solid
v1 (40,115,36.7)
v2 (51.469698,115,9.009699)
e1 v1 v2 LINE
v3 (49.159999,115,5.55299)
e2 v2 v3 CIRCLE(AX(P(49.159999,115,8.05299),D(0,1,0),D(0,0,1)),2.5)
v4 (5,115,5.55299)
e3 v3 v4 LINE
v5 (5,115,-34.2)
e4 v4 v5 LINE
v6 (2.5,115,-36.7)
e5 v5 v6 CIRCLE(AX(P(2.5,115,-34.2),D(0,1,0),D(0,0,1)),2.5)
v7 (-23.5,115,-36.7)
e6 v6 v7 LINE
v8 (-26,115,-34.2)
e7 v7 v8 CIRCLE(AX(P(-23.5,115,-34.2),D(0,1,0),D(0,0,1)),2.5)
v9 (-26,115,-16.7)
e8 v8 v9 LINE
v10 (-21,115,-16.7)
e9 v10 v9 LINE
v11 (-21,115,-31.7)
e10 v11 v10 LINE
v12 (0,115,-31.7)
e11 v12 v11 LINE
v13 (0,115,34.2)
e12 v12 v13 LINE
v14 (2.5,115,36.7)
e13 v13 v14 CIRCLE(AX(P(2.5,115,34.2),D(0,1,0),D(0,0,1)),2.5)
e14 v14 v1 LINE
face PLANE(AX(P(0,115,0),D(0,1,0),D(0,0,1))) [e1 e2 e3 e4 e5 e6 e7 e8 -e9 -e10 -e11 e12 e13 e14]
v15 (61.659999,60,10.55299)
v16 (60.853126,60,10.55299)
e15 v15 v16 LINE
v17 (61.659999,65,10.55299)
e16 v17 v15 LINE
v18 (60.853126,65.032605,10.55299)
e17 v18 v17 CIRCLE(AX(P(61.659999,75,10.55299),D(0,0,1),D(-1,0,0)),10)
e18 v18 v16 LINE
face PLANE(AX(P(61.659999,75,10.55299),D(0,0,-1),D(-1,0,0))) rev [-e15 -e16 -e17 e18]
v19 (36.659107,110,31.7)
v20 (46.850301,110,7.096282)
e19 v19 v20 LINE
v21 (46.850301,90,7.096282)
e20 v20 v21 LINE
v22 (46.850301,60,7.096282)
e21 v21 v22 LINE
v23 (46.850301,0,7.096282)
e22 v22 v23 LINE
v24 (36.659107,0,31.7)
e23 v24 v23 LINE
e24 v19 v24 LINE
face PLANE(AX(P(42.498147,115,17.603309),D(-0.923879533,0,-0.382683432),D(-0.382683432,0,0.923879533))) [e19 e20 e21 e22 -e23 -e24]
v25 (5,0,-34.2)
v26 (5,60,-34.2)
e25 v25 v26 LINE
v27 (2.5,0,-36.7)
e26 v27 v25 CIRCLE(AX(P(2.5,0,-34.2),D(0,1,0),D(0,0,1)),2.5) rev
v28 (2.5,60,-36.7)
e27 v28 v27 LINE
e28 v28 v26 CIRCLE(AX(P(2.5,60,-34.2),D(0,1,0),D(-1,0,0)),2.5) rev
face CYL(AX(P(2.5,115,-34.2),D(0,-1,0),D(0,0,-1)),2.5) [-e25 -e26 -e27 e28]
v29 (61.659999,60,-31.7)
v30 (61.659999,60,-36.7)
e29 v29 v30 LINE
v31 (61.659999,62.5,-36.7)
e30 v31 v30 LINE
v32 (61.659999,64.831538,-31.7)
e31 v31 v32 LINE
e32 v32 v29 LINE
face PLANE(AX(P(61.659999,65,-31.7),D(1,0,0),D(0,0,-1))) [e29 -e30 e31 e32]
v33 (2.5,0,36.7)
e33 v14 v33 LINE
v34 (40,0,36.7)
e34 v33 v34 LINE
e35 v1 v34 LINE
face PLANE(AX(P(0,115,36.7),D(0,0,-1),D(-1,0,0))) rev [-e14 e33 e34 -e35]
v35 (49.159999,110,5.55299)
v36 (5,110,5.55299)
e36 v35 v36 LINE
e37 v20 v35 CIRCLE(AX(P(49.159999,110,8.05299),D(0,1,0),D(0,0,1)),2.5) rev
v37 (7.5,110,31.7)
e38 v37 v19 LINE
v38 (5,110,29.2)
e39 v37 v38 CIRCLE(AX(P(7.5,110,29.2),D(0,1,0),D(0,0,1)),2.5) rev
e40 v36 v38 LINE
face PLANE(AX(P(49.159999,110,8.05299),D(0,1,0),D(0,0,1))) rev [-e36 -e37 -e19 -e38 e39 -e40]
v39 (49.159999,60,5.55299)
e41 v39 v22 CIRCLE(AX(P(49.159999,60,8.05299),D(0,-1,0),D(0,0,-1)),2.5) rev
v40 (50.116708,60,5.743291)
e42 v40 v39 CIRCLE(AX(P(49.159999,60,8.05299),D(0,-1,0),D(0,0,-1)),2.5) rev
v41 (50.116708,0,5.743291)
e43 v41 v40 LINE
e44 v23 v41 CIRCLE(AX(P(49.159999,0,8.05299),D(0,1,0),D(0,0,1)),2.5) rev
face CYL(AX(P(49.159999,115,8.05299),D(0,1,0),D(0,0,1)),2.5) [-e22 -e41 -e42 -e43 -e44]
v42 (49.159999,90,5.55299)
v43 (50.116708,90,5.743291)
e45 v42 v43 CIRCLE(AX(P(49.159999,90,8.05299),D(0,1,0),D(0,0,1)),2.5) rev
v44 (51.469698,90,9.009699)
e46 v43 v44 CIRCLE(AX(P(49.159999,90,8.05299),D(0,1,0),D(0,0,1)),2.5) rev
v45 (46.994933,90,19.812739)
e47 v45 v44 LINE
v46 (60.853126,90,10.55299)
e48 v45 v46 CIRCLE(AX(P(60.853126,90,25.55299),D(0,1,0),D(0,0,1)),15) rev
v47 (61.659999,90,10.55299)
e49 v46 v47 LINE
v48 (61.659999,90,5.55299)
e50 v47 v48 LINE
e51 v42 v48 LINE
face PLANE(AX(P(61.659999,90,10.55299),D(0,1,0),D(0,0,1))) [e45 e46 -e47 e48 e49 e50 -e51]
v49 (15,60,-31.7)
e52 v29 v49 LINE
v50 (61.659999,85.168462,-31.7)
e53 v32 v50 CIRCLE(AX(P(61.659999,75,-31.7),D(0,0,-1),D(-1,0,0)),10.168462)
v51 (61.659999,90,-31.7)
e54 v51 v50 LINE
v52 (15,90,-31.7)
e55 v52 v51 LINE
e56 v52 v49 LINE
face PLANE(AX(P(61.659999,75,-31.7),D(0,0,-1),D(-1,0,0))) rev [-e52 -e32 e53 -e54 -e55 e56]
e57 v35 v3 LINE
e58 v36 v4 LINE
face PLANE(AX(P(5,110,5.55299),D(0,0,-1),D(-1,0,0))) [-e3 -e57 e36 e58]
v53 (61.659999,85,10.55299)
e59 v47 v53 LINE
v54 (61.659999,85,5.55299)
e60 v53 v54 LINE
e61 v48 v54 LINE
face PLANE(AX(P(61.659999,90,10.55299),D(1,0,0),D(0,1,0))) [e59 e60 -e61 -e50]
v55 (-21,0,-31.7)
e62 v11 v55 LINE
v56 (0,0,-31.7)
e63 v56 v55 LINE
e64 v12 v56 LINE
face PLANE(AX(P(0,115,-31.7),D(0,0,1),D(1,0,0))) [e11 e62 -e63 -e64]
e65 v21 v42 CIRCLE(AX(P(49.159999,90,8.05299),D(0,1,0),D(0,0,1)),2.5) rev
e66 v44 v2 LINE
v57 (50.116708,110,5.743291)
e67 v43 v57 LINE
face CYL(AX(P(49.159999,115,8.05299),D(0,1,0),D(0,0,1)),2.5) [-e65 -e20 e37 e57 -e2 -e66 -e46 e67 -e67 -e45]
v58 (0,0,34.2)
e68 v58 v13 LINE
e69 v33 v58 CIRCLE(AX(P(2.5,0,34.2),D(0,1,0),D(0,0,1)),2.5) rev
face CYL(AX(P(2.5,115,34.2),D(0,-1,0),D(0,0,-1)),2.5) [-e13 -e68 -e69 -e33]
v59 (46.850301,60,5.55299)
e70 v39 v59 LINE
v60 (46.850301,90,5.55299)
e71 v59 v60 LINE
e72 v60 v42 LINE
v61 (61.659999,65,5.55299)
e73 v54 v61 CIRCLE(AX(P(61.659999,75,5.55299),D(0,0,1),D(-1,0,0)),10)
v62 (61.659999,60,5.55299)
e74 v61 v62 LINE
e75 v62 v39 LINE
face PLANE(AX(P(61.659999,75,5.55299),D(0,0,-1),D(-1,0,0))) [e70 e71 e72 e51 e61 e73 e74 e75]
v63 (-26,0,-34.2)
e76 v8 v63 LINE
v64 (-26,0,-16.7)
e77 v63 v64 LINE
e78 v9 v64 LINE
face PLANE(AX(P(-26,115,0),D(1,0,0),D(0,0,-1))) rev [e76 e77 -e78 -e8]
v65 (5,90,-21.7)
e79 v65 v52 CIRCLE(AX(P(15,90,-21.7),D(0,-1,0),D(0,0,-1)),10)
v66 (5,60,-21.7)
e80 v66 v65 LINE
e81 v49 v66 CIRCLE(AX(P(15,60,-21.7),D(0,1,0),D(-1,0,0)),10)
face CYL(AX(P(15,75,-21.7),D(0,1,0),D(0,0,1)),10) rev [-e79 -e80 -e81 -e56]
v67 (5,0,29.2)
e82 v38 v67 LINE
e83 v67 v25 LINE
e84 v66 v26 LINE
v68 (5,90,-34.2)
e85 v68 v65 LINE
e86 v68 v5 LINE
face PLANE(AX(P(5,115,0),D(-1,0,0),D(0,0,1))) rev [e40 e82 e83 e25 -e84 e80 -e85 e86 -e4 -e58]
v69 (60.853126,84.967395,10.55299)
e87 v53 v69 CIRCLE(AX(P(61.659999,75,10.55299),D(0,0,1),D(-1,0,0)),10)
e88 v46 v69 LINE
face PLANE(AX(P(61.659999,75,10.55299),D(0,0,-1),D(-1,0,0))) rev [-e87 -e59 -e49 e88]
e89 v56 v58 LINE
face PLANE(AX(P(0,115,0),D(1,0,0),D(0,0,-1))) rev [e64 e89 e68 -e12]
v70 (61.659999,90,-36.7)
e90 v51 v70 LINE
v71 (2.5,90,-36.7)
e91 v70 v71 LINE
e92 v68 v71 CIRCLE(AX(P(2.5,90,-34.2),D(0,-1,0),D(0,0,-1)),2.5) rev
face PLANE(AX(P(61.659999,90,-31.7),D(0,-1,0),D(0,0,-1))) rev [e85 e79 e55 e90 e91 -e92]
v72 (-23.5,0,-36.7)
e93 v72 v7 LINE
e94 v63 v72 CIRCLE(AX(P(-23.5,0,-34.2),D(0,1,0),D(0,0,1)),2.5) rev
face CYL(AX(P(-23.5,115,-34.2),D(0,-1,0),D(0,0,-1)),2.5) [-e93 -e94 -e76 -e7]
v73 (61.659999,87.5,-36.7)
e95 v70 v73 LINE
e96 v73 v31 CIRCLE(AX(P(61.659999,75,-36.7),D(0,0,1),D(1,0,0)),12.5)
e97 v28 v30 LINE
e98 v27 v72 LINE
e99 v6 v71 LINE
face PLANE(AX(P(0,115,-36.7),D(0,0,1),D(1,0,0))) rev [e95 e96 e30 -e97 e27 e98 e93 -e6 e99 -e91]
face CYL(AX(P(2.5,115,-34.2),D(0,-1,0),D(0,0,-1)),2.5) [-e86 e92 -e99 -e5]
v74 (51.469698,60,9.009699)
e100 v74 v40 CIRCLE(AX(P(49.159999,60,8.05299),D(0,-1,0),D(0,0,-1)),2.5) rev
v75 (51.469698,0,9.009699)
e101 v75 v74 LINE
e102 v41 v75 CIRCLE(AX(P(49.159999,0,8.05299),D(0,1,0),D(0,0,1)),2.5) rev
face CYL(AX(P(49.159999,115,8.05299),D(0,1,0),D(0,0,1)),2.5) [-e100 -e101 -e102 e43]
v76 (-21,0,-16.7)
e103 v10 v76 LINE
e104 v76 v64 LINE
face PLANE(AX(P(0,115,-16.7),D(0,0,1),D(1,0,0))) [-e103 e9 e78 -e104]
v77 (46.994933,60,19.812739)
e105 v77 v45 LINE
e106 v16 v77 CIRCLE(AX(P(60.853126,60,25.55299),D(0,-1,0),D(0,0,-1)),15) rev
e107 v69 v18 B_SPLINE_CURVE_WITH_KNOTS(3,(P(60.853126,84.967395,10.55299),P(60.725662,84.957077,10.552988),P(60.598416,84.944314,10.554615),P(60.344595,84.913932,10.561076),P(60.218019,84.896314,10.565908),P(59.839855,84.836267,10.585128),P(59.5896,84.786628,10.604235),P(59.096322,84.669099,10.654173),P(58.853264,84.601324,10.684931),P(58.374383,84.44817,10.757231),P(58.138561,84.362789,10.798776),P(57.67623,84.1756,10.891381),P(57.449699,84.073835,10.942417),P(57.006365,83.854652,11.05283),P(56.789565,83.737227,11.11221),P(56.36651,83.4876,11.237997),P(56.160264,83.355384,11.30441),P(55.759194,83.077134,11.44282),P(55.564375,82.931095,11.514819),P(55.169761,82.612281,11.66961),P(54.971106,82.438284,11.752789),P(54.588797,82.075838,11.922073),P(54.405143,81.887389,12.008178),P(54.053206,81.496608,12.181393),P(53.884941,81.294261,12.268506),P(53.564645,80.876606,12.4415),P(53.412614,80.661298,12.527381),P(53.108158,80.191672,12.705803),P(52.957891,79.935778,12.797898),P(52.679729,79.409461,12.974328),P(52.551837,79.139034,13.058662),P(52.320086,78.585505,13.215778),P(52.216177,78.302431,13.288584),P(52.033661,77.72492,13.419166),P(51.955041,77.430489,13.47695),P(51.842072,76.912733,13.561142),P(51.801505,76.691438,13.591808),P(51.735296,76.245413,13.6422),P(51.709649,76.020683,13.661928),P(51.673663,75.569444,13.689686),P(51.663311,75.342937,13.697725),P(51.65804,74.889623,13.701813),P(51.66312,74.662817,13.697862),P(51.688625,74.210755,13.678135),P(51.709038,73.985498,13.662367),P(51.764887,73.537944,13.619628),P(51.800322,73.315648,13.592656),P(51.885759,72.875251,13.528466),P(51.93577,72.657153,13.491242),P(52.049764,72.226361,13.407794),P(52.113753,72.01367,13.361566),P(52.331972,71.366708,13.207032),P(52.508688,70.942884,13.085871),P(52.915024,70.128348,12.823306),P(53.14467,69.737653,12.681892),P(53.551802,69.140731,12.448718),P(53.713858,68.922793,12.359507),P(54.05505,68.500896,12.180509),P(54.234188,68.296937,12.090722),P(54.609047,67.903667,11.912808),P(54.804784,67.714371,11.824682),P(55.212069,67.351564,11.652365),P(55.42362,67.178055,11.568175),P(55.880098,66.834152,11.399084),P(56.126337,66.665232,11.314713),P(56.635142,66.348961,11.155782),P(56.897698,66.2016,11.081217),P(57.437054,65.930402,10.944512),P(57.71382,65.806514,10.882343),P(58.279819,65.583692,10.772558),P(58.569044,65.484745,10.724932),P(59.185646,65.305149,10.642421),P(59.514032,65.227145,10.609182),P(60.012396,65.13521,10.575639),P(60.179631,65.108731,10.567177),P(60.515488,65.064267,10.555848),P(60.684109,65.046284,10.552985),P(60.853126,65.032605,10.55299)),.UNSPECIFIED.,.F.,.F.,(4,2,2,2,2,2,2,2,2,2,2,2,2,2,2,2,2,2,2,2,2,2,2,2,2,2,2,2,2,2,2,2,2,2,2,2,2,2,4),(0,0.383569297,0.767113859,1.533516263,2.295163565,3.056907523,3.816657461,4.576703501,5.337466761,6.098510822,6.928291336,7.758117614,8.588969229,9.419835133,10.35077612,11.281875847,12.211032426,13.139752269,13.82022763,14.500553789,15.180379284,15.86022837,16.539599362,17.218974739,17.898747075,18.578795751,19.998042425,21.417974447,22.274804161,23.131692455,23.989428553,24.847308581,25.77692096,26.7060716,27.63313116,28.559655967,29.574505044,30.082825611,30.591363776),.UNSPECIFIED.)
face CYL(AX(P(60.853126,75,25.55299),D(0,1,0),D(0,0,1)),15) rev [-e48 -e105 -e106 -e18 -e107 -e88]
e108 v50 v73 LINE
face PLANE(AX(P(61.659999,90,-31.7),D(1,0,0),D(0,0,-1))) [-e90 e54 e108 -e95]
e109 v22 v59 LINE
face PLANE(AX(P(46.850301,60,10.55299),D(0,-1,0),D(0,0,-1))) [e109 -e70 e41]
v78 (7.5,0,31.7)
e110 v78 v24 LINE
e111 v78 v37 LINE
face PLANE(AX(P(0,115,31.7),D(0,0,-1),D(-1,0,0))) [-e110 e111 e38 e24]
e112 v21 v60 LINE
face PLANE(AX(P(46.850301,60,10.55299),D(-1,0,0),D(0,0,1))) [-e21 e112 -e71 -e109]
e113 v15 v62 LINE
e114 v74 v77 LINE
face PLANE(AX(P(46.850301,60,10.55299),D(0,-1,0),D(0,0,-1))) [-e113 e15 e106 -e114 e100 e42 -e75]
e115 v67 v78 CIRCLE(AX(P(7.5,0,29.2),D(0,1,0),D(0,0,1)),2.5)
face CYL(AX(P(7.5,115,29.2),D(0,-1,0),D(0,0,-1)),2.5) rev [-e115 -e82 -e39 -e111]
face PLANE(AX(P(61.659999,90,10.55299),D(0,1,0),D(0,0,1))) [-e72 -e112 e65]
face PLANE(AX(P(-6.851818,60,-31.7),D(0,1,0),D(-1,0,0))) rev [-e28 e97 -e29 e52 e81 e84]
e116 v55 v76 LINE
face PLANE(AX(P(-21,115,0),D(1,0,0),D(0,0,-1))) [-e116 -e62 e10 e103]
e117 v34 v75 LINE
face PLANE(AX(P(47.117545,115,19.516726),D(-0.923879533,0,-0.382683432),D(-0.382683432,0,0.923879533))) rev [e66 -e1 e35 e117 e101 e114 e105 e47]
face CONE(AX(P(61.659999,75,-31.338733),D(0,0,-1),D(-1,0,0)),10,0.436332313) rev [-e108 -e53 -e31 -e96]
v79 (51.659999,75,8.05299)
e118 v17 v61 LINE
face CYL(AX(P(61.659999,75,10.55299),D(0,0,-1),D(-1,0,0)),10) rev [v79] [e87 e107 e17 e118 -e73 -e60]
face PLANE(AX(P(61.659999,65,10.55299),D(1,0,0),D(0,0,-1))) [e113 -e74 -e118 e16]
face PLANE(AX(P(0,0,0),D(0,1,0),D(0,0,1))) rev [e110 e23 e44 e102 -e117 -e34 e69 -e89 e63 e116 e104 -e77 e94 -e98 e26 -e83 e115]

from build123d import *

# Parameters (mm, degrees)
EXTRUDE_1_DEPTH  = 115
FILLET_5_R       = 2.5
FILLET_6_R       = 2.5
FILLET_8_R       = 2.5
FILLET_10_R      = 2.5
FILLET_11_R      = 2.5
EXTRUDE_2_DEPTH  = 5
EXTRUDE_3_DEPTH  = 5
FILLET_12_R      = 10
CHAMFER_2_SIZE   = 5.361267301
CHAMFER_2_SIZE_2 = 2.5
EXTRUDE_5_DEPTH  = 5
FILLET_13_R      = 15


# Some blends are built 0.0001 mm under size
with BuildPart() as part:
    # ｽｹｯﾁ1 → ﾎﾞｽ - 押し出し1 (new body)
    with BuildSketch(Plane(origin=(0, 0, 0), x_dir=(1, 0, 0), z_dir=(0, 1, 0))):
        Polygon((47.807009209, -4.786582838), (36.65910681, -31.7), (5, -31.7), (5, 36.7), (-26, 36.7), (-26, 16.7), (-21, 16.7), (-21, 31.7), (0, 31.7), (0, -36.7), (40, -36.7), (52.426406871, -6.7), align=None)
    extrude(amount=EXTRUDE_1_DEPTH)

    # ﾌｨﾚｯﾄ5
    fillet_5_edges = [part.edges().sort_by_distance(p)[0] for p in [
        (-26, 57.5, -36.7),
    ]]
    fillet(fillet_5_edges, radius=FILLET_5_R)

    # ﾌｨﾚｯﾄ6
    fillet_6_edges = [part.edges().sort_by_distance(p)[0] for p in [
        (5, 57.5, -36.7),
    ]]
    fillet(fillet_6_edges, radius=FILLET_6_R)

    # ﾌｨﾚｯﾄ8
    fillet_8_edges = [part.edges().sort_by_distance(p)[0] for p in [
        (52.426406871, 57.5, 6.7),
        (47.807009209, 57.5, 4.786582838),
    ]]
    fillet(fillet_8_edges, radius=FILLET_8_R - 0.0001)  # a hair under: the kernel refuses the full size

    # ﾌｨﾚｯﾄ10
    fillet_10_edges = [part.edges().sort_by_distance(p)[0] for p in [
        (0, 57.5, 36.7),
    ]]
    fillet(fillet_10_edges, radius=FILLET_10_R)

    # ﾌｨﾚｯﾄ11
    fillet_11_edges = [part.edges().sort_by_distance(p)[0] for p in [
        (5, 57.5, 31.7),
    ]]
    fillet(fillet_11_edges, radius=FILLET_11_R)

    # ｽｹｯﾁ2 → ﾎﾞｽ - 押し出し2 (add)
    with BuildSketch(Plane(origin=(0, 115, 0), x_dir=(1, 0, 0), z_dir=(0, 1, 0))):
        with BuildLine():
            Line((49.159999459, -5.55299025), (40, -5.55299025))
            Line((40, -5.55299025), (5, -5.55299025))
            Line((5, -5.55299025), (5, -36.7))
            Line((5, -36.7), (40, -36.7))
            Line((40, -36.7), (51.46969829, -9.009698831))
            ThreePointArc((51.46969829, -9.009698831), (51.23867349, -6.664064668), (49.159999459, -5.55299025))
        make_face()
    extrude(amount=-EXTRUDE_2_DEPTH)

    # ｽｹｯﾁ3 → ﾎﾞｽ - 押し出し3 (add)
    with BuildSketch(Plane(origin=(0, 0, -36.7), x_dir=(-1, 0, 0), z_dir=(0, 0, -1))):
        with BuildLine():
            Line((6.851817904, 90), (-51.659999459, 90))
            Line((-51.659999459, 90), (-61.659999459, 90))
            Line((-61.659999459, 90), (-61.659999459, 85))
            ThreePointArc((-61.659999459, 85), (-51.659999459, 75), (-61.659999459, 65))
            Line((-61.659999459, 65), (-61.659999459, 60))
            Line((-61.659999459, 60), (-51.659999459, 60))
            Line((-51.659999459, 60), (6.851817904, 60))
            Line((6.851817904, 60), (6.851817904, 90))
        make_face()
    extrude(amount=-EXTRUDE_3_DEPTH)

    # ﾌｨﾚｯﾄ12
    fillet_12_edges = [part.edges().sort_by_distance(p)[0] for p in [
        (5, 75, -31.7),
    ]]
    fillet(fillet_12_edges, radius=FILLET_12_R)

    # 面取り2
    # the kernel refuses this chamfer: 5.361267301, 2.5 mm, written as the material it takes off along each edge
    with BuildSketch(Plane(origin=(61.659999459, 75, -36.7), x_dir=(0.9839382263976153, 0.1785092900482071, 0), z_dir=(0.1785092900482071, -0.9839382263976153, 0))) as chamfer_2_piece_1:
        Polygon((10, CHAMFER_2_SIZE), (10 + CHAMFER_2_SIZE_2, 0), (10, 0), align=None)
    revolve(axis=Axis((61.659999459, 75, -36.7), (0, 0, 1)), revolution_arc=339.434115604, mode=Mode.SUBTRACT)

    # ｽｹｯﾁ4 → ﾎﾞｽ - 押し出し5 (add)
    with BuildSketch(Plane(origin=(0, 0, 5.55299025), x_dir=(-1, 0, 0), z_dir=(0, 0, -1))):
        with BuildLine():
            Line((-46.850300628, 90), (-51.659999459, 90))
            Line((-51.659999459, 90), (-61.659999459, 90))
            Line((-61.659999459, 90), (-61.659999459, 85))
            ThreePointArc((-61.659999459, 85), (-51.659999459, 75), (-61.659999459, 65))
            Line((-61.659999459, 65), (-61.659999459, 60))
            Line((-61.659999459, 60), (-51.659999459, 60))
            Line((-51.659999459, 60), (-46.850300628, 60))
            Line((-46.850300628, 60), (-46.850300628, 90))
        make_face()
    extrude(amount=-EXTRUDE_5_DEPTH)

    # ﾌｨﾚｯﾄ13
    # the kernel refuses this fillet: 15 mm, written as the material it adds along each edge
    with BuildSketch(Plane(origin=(50.830446054, 90, 10.55299025), x_dir=(-0.3826834323650874, 0, 0.9238795325112876), z_dir=(0, -1, 0))) as fillet_13_piece_1_section:
        with BuildLine():
            CenterArc((FILLET_13_R * 0.668178637919, -FILLET_13_R), FILLET_13_R, 90, 67.5)
            Line((-FILLET_13_R * 0.255700894592, -FILLET_13_R * 0.617316567635), (0, 0))
            Line((0, 0), (FILLET_13_R * 0.668178637919, 0))
        make_face()
    fillet_13_piece_1 = extrude(amount=30, mode=Mode.PRIVATE)
    fillet_13_piece_1 = fillet_13_piece_1 - Plane(origin=(61.659999459, 75, 12.967680369), x_dir=(0, 1, 0), z_dir=(0, 0, -1)) * Cylinder(10, 101, mode=Mode.PRIVATE)
    add(fillet_13_piece_1)


solid = part.part
